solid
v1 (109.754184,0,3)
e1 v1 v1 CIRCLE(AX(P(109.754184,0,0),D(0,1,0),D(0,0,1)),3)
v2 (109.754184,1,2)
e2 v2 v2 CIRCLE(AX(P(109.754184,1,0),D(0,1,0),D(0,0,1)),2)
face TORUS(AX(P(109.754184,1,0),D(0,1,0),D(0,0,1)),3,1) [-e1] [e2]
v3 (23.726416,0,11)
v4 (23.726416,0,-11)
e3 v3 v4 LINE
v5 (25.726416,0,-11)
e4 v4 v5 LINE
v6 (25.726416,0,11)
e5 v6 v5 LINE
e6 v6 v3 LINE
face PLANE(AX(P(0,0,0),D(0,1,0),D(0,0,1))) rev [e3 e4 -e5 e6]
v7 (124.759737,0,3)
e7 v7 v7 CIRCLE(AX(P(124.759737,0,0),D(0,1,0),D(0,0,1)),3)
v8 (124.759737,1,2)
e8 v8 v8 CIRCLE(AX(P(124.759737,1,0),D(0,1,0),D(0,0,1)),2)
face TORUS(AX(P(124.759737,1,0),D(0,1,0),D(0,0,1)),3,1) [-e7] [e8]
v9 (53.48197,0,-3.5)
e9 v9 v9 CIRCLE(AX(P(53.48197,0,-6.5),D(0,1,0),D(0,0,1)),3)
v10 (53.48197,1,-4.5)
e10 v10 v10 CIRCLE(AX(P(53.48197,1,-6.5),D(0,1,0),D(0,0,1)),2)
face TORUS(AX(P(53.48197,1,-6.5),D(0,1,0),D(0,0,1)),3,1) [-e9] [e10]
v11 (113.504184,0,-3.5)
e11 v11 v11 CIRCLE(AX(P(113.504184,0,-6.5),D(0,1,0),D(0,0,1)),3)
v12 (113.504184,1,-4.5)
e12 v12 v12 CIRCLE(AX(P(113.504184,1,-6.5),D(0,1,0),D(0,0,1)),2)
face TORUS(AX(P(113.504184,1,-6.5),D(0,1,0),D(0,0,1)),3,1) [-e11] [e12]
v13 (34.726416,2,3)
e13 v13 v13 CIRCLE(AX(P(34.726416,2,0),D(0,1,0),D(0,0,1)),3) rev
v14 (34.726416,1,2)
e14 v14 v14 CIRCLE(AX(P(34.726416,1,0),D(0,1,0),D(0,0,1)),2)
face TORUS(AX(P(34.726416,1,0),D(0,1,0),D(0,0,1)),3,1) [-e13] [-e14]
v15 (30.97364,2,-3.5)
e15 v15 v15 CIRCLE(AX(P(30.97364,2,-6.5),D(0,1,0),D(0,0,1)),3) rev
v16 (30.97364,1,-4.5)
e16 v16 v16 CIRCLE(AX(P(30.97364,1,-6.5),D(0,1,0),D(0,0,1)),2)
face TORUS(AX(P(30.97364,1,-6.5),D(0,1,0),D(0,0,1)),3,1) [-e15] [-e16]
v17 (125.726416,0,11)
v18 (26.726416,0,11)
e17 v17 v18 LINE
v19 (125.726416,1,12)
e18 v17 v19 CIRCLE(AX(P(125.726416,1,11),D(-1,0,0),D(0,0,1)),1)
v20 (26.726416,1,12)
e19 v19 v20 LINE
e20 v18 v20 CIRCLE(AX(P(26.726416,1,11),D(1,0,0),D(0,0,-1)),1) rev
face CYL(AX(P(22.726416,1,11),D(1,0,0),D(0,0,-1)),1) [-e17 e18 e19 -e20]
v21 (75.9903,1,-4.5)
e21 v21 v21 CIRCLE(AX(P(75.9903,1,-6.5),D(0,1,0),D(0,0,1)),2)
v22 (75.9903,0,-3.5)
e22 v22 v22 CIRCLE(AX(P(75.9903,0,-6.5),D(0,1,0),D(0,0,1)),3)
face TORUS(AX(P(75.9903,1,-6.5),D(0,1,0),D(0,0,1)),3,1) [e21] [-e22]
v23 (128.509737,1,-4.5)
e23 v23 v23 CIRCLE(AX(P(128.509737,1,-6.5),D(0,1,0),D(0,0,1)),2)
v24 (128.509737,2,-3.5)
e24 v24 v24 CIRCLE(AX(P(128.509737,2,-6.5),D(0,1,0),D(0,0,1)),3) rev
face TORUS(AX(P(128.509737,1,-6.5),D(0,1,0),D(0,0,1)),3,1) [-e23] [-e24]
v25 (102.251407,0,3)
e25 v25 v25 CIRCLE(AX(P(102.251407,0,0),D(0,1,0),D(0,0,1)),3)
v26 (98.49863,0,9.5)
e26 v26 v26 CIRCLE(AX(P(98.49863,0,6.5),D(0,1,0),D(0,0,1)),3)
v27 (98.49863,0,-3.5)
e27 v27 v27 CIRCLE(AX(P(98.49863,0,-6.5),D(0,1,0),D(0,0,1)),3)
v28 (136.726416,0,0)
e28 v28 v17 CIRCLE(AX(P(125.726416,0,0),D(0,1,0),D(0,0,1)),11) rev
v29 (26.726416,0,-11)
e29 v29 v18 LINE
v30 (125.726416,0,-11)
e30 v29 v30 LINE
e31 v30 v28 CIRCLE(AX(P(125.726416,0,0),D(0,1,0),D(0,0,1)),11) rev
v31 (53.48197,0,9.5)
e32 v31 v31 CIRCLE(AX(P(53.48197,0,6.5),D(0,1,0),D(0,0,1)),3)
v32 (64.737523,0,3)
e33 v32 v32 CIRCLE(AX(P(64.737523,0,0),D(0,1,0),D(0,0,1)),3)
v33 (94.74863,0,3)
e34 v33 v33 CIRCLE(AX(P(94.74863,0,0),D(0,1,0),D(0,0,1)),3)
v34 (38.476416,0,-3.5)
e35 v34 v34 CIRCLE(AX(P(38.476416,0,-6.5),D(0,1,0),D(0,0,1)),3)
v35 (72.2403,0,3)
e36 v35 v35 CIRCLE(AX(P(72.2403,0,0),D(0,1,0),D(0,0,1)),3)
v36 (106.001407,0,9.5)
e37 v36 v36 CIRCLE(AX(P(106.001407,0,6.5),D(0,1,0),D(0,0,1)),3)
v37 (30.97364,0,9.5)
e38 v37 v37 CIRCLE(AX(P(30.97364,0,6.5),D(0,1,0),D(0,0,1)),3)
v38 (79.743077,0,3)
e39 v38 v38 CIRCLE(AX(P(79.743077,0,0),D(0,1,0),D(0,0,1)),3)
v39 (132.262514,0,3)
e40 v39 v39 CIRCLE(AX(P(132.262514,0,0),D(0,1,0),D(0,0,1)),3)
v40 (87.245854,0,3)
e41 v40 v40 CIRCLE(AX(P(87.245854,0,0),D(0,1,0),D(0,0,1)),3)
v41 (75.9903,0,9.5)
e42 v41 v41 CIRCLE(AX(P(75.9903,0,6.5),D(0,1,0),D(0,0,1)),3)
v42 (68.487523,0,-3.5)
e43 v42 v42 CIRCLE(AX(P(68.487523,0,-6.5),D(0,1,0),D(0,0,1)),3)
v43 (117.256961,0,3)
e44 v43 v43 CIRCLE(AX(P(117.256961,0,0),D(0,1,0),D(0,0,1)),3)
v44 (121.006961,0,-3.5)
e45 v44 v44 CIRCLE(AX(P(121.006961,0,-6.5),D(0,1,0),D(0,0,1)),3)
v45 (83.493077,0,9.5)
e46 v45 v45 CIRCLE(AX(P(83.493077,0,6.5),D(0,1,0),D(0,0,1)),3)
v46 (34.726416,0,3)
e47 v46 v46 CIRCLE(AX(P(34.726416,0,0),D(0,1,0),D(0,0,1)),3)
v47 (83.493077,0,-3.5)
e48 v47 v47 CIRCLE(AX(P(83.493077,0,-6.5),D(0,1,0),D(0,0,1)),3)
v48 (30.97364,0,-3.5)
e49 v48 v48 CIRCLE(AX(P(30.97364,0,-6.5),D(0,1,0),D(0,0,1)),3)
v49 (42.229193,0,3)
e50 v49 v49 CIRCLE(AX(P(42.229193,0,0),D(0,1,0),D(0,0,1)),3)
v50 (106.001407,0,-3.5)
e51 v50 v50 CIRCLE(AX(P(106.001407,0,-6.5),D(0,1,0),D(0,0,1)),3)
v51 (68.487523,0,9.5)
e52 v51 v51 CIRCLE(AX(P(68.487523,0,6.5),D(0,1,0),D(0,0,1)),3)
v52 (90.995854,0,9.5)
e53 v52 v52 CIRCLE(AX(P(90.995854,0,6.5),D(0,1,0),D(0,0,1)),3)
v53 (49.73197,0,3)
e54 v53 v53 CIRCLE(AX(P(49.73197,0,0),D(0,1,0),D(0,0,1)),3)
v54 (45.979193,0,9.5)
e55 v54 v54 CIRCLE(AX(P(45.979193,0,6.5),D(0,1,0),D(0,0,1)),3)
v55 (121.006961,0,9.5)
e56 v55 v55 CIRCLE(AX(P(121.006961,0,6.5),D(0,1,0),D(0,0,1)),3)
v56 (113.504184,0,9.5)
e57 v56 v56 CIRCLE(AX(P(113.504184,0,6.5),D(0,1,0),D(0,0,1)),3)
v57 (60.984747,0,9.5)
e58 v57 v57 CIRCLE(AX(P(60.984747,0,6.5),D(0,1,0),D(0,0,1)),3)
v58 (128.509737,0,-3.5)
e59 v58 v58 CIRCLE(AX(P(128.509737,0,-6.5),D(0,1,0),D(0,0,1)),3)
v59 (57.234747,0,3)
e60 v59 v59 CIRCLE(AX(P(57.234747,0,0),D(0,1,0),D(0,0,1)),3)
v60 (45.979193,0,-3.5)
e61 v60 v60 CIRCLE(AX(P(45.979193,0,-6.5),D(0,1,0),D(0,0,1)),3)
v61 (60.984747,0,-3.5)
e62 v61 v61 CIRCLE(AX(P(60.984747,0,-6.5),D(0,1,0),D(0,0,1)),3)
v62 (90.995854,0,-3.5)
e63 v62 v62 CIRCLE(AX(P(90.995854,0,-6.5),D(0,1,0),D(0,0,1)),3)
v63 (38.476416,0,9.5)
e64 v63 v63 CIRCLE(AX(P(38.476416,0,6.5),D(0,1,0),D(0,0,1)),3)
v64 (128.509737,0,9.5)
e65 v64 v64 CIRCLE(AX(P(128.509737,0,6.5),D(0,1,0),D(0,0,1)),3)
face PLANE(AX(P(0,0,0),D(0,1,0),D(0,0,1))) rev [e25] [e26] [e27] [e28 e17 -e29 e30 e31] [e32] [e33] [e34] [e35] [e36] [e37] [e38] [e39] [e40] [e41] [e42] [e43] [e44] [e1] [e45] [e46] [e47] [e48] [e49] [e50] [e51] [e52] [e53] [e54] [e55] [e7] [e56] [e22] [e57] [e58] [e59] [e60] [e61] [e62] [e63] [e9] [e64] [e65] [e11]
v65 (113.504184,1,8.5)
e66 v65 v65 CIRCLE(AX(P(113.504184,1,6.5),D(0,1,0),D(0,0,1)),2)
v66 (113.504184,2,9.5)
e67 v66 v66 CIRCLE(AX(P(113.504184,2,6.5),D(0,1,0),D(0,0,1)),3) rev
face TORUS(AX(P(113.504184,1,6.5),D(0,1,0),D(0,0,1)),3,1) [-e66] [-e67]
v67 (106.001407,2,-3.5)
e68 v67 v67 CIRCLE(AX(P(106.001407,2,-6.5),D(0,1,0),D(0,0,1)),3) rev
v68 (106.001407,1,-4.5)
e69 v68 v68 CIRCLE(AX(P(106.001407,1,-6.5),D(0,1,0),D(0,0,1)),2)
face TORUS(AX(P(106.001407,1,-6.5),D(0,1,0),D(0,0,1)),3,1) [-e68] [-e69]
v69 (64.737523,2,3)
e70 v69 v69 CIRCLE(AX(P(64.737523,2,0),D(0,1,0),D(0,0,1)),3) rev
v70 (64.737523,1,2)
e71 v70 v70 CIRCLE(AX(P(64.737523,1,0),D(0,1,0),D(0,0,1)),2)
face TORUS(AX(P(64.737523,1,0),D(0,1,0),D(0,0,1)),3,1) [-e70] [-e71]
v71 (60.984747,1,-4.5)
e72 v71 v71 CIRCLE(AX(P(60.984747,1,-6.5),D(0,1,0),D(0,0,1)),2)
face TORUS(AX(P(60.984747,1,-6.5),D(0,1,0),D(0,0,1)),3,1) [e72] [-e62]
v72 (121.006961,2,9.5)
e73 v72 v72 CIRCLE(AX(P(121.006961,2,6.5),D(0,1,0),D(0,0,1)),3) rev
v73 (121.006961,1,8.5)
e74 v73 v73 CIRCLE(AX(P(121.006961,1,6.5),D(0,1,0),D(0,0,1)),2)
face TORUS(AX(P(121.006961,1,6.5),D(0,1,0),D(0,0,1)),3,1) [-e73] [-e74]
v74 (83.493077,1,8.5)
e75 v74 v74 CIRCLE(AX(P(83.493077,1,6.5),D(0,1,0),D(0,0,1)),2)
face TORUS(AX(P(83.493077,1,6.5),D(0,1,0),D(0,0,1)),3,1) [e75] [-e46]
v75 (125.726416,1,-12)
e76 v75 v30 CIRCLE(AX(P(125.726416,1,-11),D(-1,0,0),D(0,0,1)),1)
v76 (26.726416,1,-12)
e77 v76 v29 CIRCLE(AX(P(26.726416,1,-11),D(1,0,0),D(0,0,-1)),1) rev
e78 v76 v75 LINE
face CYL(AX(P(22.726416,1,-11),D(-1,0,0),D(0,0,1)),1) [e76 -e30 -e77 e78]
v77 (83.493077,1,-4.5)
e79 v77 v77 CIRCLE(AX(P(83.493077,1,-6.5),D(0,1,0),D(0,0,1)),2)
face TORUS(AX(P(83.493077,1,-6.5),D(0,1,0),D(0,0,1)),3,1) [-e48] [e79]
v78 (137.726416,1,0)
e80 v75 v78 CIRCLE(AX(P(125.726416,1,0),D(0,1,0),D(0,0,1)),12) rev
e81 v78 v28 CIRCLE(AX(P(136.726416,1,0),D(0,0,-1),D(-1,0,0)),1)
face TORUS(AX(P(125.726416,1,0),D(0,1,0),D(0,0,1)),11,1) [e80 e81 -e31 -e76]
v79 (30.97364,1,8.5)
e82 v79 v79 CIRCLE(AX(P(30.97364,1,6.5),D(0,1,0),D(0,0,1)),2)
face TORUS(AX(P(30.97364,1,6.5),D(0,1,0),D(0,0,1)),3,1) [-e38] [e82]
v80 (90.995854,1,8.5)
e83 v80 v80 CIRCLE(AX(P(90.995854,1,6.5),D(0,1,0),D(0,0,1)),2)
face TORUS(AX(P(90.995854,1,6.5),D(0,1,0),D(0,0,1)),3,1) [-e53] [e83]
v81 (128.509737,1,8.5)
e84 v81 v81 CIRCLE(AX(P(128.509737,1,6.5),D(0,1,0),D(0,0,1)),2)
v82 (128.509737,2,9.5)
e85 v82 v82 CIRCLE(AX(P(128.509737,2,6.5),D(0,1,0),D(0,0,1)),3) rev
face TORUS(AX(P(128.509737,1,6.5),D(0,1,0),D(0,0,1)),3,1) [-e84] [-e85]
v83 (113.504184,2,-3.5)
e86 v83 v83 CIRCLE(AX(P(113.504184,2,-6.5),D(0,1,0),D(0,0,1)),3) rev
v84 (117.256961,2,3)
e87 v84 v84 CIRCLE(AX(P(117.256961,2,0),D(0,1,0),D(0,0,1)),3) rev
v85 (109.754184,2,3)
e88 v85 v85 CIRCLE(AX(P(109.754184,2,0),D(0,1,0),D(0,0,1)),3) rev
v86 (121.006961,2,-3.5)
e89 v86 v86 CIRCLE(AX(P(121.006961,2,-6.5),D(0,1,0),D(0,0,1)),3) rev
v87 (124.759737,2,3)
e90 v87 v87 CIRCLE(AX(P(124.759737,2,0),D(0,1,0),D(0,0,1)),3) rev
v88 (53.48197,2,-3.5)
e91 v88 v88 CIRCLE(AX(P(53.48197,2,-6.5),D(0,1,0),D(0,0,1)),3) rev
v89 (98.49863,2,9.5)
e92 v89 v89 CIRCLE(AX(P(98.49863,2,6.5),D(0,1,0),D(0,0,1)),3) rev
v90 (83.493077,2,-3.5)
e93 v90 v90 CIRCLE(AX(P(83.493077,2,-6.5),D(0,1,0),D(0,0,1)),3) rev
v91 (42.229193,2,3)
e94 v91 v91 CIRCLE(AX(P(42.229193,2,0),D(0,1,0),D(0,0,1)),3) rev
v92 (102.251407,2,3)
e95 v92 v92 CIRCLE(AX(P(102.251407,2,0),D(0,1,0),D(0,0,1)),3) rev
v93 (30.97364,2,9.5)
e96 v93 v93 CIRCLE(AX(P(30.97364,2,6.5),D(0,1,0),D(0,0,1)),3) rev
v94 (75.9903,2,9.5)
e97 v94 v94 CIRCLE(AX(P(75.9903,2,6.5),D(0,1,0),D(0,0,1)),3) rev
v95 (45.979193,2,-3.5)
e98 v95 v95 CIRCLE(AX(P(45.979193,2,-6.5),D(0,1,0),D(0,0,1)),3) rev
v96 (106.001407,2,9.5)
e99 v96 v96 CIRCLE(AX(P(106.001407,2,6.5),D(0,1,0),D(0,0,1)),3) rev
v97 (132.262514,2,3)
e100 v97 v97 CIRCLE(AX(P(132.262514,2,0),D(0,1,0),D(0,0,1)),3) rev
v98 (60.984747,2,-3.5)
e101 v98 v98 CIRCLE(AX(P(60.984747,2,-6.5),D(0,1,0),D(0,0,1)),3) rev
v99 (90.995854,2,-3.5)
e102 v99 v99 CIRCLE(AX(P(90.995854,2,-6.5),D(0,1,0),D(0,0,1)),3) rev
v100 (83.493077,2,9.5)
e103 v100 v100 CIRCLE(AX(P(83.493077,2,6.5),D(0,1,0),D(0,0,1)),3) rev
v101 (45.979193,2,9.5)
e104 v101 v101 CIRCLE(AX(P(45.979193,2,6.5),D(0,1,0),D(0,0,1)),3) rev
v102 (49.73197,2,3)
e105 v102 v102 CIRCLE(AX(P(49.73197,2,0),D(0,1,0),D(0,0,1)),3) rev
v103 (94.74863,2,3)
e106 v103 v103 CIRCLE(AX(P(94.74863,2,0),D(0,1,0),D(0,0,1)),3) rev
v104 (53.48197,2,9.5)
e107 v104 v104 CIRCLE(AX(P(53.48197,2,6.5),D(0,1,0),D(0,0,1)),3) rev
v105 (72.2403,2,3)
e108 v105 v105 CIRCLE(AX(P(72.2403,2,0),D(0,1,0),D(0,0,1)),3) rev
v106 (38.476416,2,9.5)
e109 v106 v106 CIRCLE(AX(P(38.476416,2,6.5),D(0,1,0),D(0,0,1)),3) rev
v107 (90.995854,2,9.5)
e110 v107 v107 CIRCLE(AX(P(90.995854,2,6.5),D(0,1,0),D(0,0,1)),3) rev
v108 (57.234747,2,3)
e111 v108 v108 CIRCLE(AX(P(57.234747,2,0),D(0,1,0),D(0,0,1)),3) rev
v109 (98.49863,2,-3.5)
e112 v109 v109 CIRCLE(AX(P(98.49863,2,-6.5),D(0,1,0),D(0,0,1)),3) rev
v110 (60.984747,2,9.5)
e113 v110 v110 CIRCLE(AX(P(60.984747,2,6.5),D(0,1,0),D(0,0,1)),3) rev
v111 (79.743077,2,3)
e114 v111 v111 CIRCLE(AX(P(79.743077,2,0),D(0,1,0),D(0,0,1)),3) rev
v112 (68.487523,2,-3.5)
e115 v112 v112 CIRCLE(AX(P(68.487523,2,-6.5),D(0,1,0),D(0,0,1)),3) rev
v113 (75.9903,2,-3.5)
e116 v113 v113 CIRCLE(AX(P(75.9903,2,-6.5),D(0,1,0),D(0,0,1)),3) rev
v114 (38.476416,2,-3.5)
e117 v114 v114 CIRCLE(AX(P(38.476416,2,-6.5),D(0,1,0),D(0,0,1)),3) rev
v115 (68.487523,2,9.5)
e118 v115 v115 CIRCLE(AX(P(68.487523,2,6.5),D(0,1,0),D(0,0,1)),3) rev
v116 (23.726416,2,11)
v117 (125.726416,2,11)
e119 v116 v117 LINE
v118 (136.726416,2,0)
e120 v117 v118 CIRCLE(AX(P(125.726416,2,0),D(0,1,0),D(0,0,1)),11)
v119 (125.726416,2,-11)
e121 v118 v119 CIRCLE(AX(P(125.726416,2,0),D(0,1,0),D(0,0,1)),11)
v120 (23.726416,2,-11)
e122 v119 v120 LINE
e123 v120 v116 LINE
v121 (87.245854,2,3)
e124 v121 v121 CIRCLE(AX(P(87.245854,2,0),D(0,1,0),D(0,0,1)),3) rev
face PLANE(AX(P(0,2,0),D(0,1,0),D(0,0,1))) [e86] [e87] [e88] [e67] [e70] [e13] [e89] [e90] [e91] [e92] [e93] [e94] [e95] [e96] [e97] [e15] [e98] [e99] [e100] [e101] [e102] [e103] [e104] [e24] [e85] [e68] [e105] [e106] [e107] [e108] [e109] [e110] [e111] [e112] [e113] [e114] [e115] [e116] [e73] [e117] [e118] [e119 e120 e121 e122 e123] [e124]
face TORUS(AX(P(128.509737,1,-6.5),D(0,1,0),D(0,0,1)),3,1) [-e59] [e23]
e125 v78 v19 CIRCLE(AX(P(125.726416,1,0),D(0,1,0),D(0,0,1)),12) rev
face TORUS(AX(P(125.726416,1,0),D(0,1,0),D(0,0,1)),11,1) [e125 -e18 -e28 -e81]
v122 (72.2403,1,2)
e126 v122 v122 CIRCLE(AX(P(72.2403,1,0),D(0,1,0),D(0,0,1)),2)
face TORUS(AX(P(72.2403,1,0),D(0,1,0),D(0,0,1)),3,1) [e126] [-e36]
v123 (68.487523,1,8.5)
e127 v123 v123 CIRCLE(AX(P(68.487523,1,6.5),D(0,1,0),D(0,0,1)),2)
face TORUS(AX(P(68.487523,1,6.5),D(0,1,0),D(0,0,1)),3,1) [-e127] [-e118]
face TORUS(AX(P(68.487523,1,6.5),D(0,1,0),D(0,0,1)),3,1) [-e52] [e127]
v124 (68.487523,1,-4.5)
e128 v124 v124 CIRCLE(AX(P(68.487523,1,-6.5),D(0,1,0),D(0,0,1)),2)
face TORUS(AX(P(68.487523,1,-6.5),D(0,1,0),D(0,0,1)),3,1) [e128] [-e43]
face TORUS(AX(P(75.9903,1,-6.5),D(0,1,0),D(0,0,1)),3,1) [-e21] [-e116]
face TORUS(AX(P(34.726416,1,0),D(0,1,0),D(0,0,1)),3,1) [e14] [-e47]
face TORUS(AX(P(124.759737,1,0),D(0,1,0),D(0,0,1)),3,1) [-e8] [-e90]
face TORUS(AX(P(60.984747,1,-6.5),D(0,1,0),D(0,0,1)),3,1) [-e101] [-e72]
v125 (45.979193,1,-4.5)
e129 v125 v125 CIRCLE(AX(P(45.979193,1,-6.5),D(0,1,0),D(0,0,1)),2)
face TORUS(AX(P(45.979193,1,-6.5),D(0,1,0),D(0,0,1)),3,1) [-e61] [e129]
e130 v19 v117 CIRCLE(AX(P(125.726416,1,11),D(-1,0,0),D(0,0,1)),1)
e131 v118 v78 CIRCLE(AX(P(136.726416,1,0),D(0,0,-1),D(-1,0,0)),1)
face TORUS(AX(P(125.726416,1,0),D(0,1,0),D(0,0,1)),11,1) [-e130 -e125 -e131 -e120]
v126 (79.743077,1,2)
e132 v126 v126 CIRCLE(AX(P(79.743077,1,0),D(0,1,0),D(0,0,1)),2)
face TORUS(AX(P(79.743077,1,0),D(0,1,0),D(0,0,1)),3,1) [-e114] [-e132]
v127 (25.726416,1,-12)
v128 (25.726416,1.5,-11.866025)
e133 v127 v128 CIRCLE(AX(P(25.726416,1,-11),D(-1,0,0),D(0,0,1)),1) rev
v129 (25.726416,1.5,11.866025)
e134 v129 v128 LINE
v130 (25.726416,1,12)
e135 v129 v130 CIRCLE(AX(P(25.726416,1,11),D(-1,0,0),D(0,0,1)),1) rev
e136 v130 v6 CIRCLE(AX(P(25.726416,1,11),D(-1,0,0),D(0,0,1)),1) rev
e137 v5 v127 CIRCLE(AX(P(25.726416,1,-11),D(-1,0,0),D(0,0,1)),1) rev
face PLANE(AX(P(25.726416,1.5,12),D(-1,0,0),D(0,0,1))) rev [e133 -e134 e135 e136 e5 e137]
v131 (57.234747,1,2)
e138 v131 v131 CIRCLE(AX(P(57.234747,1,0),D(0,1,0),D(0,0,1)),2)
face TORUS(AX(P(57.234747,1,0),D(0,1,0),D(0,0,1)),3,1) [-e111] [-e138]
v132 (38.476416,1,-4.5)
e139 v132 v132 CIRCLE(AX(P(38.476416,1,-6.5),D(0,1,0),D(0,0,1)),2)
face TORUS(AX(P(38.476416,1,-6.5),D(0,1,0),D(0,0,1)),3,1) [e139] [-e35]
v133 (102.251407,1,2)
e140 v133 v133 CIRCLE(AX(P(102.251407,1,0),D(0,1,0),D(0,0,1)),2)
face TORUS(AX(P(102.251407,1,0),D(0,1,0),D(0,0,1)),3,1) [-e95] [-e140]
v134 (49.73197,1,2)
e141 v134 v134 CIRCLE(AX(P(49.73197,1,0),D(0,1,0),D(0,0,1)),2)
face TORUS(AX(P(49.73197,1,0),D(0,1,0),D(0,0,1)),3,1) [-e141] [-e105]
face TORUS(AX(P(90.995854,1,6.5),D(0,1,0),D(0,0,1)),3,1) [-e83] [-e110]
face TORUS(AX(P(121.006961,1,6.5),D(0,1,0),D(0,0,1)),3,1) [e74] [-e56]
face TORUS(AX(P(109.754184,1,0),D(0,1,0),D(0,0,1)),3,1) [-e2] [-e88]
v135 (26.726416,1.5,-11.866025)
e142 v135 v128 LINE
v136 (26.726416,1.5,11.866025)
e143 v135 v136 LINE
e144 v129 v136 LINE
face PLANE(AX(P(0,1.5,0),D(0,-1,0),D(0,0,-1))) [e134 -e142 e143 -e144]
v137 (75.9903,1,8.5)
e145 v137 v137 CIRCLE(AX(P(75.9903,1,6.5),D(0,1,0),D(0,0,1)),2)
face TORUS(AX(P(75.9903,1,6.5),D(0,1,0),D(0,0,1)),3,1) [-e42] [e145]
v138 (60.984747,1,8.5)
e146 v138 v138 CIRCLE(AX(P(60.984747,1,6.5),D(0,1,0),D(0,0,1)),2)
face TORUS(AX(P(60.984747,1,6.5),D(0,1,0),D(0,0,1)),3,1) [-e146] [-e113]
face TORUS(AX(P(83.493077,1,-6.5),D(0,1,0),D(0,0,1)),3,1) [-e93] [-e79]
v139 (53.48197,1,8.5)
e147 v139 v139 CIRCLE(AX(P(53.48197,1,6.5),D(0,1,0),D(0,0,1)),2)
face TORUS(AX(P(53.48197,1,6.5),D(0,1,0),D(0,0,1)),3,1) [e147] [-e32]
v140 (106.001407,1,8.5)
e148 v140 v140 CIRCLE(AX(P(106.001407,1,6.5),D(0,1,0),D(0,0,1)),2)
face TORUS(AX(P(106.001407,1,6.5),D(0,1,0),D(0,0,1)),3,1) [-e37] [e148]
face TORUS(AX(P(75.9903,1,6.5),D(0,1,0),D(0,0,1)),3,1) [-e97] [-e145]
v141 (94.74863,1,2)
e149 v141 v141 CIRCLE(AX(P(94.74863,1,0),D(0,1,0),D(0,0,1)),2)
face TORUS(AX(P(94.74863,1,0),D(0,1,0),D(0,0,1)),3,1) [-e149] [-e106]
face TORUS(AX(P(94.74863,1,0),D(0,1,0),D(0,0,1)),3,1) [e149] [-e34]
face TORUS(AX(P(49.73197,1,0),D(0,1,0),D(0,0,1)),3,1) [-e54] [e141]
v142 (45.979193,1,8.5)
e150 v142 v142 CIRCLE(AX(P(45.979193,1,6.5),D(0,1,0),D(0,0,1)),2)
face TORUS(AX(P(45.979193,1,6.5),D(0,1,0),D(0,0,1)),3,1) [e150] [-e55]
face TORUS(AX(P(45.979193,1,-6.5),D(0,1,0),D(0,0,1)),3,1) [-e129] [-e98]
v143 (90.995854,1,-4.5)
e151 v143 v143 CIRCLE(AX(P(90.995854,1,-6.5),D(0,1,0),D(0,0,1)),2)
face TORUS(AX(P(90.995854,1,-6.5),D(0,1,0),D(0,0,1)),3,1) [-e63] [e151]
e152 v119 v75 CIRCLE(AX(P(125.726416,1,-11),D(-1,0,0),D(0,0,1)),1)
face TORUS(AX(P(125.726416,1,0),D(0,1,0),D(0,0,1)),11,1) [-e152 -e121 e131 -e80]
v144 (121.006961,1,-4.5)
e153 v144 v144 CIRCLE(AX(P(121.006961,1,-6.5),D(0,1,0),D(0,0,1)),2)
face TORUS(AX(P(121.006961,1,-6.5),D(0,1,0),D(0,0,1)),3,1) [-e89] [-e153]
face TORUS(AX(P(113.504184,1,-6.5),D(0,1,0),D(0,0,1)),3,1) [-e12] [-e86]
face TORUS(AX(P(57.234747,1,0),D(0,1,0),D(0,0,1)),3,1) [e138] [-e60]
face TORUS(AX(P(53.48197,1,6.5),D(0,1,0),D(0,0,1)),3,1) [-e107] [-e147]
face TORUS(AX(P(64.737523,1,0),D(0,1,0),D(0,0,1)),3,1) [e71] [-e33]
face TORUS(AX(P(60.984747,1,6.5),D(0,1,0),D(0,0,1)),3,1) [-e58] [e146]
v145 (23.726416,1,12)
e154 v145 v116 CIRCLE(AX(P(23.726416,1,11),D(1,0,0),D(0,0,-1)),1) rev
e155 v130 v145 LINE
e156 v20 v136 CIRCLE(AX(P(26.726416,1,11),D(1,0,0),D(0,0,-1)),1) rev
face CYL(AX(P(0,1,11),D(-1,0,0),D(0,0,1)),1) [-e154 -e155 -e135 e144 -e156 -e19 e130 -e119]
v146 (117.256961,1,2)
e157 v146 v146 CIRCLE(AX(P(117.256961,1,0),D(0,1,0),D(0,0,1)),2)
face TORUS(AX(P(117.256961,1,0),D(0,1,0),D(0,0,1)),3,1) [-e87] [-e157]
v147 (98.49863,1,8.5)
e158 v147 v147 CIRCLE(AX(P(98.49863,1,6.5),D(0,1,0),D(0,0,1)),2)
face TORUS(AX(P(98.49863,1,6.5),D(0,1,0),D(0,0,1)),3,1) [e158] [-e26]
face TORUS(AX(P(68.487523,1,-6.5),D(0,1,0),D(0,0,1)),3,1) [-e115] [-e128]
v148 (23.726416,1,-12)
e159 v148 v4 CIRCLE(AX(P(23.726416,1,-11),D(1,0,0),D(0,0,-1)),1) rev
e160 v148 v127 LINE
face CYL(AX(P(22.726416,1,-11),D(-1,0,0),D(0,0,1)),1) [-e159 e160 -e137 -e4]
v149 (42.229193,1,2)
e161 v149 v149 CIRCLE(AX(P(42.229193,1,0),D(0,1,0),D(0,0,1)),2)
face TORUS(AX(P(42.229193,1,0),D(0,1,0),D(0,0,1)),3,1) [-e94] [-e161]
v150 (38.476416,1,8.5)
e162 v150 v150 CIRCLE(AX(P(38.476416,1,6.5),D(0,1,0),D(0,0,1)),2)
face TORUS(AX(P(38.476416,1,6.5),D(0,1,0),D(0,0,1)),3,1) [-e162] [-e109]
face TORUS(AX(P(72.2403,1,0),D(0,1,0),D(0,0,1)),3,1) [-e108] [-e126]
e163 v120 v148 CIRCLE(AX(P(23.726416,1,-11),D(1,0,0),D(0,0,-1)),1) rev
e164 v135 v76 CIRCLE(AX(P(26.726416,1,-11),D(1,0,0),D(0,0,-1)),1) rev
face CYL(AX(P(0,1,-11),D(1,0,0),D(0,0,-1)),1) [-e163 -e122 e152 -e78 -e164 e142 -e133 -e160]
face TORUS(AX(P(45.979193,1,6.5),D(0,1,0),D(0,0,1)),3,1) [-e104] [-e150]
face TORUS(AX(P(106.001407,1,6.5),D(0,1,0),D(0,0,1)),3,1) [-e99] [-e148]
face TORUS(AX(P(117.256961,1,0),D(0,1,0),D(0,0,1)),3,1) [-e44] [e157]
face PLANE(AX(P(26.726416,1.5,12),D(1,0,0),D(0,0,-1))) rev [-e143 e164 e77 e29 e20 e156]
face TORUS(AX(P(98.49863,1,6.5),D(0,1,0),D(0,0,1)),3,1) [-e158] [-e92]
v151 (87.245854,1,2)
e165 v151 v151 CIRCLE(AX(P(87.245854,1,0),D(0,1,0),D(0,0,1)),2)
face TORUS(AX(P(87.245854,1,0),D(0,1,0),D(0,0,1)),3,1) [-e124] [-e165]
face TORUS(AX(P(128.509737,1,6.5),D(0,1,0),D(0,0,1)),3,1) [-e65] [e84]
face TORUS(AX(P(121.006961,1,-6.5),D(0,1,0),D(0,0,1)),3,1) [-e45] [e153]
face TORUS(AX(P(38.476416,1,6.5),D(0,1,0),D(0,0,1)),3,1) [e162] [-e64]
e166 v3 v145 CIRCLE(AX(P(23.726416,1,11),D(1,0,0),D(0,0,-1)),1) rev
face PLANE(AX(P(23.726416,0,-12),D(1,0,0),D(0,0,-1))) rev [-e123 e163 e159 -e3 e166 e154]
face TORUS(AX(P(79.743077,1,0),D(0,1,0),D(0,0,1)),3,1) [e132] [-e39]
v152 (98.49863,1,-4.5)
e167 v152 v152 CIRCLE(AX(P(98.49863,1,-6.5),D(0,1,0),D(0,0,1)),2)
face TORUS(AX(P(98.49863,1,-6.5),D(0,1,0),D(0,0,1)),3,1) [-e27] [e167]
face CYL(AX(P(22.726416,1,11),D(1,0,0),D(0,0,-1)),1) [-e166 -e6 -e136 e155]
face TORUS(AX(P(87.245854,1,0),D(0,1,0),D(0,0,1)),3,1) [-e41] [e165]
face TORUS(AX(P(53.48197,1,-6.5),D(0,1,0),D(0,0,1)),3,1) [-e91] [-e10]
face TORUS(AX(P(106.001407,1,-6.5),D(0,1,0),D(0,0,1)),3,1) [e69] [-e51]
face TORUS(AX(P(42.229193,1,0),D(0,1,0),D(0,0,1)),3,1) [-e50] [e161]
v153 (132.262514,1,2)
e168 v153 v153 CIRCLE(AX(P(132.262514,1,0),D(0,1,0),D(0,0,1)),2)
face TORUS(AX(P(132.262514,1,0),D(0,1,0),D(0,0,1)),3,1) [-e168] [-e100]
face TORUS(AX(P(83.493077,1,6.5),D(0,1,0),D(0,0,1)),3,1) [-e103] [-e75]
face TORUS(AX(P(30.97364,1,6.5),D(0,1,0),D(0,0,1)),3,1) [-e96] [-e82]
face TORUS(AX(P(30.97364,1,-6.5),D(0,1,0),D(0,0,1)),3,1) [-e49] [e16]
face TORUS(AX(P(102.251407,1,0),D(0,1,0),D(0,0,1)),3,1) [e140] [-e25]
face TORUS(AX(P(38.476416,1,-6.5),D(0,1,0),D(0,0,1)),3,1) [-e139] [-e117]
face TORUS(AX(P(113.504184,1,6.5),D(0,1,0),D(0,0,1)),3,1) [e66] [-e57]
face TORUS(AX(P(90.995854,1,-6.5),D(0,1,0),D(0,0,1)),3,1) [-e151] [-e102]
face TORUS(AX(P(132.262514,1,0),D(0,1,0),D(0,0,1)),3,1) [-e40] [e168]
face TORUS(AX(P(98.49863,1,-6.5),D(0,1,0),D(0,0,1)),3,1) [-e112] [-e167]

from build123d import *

# Parameters (mm, degrees)
SKETCH1_W               = 115
SKETCH1_H               = 24
BOSS_EXTRUDE1_DEPTH     = 2
FILLET4_R               = 12
SKETCH4_R               = 2
CUT_EXTRUDE2_DEPTH      = 139.262669437
FILLET3_R               = 1
CUT_EXTRUDE6_DEPTH      = 139.262669437
CUT_EXTRUDE6_DEPTH_BACK = 139.262669437
SKETCH11_W              = 1
SKETCH11_H              = 24
SKETCH12_W              = 1
SKETCH12_H              = 24
CUT_EXTRUDE7_DEPTH      = 1.5


with BuildPart() as part:
    # Sketch1 → Boss-Extrude1 (new body)
    with BuildSketch(Plane(origin=(0, 0, 0), x_dir=(1, 0, 0), z_dir=(0, 1, 0))):
        with Locations((80.226416348, 0)):
            Rectangle(SKETCH1_W, SKETCH1_H)
    extrude(amount=BOSS_EXTRUDE1_DEPTH)

    # Fillet4
    fillet4_edges = [part.edges().sort_by_distance(p)[0] for p in [
        (137.726416348, 1, 12),
        (137.726416348, 1, -12),
    ]]
    fillet(fillet4_edges, radius=FILLET4_R - 0.0001)  # a hair under: the kernel refuses the full size

    # Sketch4 → Cut-Extrude2 (cut, through all)
    with BuildSketch(Plane(origin=(0, 2, 0), x_dir=(1, 0, 0), z_dir=(0, 1, 0))):
        with Locations(Location((30.973639598, 6.5, 0), (0, 0, 270))):
            Circle(SKETCH4_R)
        with Locations(Location((34.726416348, 0, 0), (0, 0, 270))):
            Circle(SKETCH4_R)
        with Locations(Location((30.973639598, -6.5, 0), (0, 0, 270))):
            Circle(SKETCH4_R)
        with Locations(Location((42.229193097, 0, 0), (0, 0, 270))):
            Circle(SKETCH4_R)
        with Locations(Location((38.476416348, 6.5, 0), (0, 0, 270))):
            Circle(SKETCH4_R)
        with Locations(Location((38.476416348, -6.5, 0), (0, 0, 270))):
            Circle(SKETCH4_R)
        with Locations(Location((49.731969847, 0, 0), (0, 0, 270))):
            Circle(SKETCH4_R)
        with Locations(Location((45.979193097, 6.5, 0), (0, 0, 270))):
            Circle(SKETCH4_R)
        with Locations(Location((45.979193097, -6.5, 0), (0, 0, 270))):
            Circle(SKETCH4_R)
        with Locations(Location((57.234746597, 0, 0), (0, 0, 270))):
            Circle(SKETCH4_R)
        with Locations(Location((53.481969847, 6.5, 0), (0, 0, 270))):
            Circle(SKETCH4_R)
        with Locations(Location((53.481969847, -6.5, 0), (0, 0, 270))):
            Circle(SKETCH4_R)
        with Locations(Location((64.737523346, 0, 0), (0, 0, 270))):
            Circle(SKETCH4_R)
        with Locations(Location((60.984746597, 6.5, 0), (0, 0, 270))):
            Circle(SKETCH4_R)
        with Locations(Location((60.984746597, -6.5, 0), (0, 0, 270))):
            Circle(SKETCH4_R)
        with Locations(Location((72.240300096, 0, 0), (0, 0, 270))):
            Circle(SKETCH4_R)
        with Locations(Location((68.487523346, 6.5, 0), (0, 0, 270))):
            Circle(SKETCH4_R)
        with Locations(Location((68.487523346, -6.5, 0), (0, 0, 270))):
            Circle(SKETCH4_R)
        with Locations(Location((79.743076846, 0, 0), (0, 0, 270))):
            Circle(SKETCH4_R)
        with Locations(Location((75.990300096, 6.5, 0), (0, 0, 270))):
            Circle(SKETCH4_R)
        with Locations(Location((75.990300096, -6.5, 0), (0, 0, 270))):
            Circle(SKETCH4_R)
        with Locations(Location((87.245853596, 0, 0), (0, 0, 270))):
            Circle(SKETCH4_R)
        with Locations(Location((83.493076846, 6.5, 0), (0, 0, 270))):
            Circle(SKETCH4_R)
        with Locations(Location((83.493076846, -6.5, 0), (0, 0, 270))):
            Circle(SKETCH4_R)
        with Locations(Location((94.748630345, 0, 0), (0, 0, 270))):
            Circle(SKETCH4_R)
        with Locations(Location((90.995853596, 6.5, 0), (0, 0, 270))):
            Circle(SKETCH4_R)
        with Locations(Location((90.995853596, -6.5, 0), (0, 0, 270))):
            Circle(SKETCH4_R)
        with Locations(Location((102.251407095, 0, 0), (0, 0, 270))):
            Circle(SKETCH4_R)
        with Locations(Location((98.498630345, 6.5, 0), (0, 0, 270))):
            Circle(SKETCH4_R)
        with Locations(Location((98.498630345, -6.5, 0), (0, 0, 270))):
            Circle(SKETCH4_R)
        with Locations(Location((109.754183845, 0, 0), (0, 0, 270))):
            Circle(SKETCH4_R)
        with Locations(Location((106.001407095, 6.5, 0), (0, 0, 270))):
            Circle(SKETCH4_R)
        with Locations(Location((106.001407095, -6.5, 0), (0, 0, 270))):
            Circle(SKETCH4_R)
        with Locations(Location((117.256960595, 0, 0), (0, 0, 270))):
            Circle(SKETCH4_R)
        with Locations(Location((113.504183845, 6.5, 0), (0, 0, 270))):
            Circle(SKETCH4_R)
        with Locations(Location((113.504183845, -6.5, 0), (0, 0, 270))):
            Circle(SKETCH4_R)
        with Locations(Location((124.759737344, 0, 0), (0, 0, 270))):
            Circle(SKETCH4_R)
        with Locations(Location((121.006960595, 6.5, 0), (0, 0, 270))):
            Circle(SKETCH4_R)
        with Locations(Location((121.006960595, -6.5, 0), (0, 0, 270))):
            Circle(SKETCH4_R)
        with Locations(Location((132.262514094, 0, 0), (0, 0, 270))):
            Circle(SKETCH4_R)
        with Locations(Location((128.509737344, 6.5, 0), (0, 0, 270))):
            Circle(SKETCH4_R)
        with Locations(Location((128.509737344, -6.5, 0), (0, 0, 270))):
            Circle(SKETCH4_R)
    extrude(amount=-CUT_EXTRUDE2_DEPTH, mode=Mode.SUBTRACT)

    # Fillet3
    fillet3_edges = [part.edges().sort_by_distance(p)[0] for p in [
        (74.226466348, 0, 12),
        (74.226466348, 0, -12),
        (30.973639598, 0, -8.5),
        (113.504183845, 0, 4.5),
        (117.256960595, 0, -2),
        (113.504183845, 0, -8.5),
        (60.984746597, 0, -8.5),
        (53.481969847, 0, 4.5),
        (57.234746597, 0, -2),
        (53.481969847, 0, -8.5),
        (72.240300096, 0, -2),
        (68.487523346, 0, -8.5),
        (60.984746597, 0, 4.5),
        (64.737523346, 0, -2),
        (42.229193097, 0, -2),
        (38.476416348, 0, -8.5),
        (30.973639598, 0, 4.5),
        (34.726416348, 0, -2),
        (45.979193097, 0, 4.5),
        (49.731969847, 0, -2),
        (45.979193097, 0, -8.5),
        (38.476416348, 0, 4.5),
        (102.251407095, 0, -2),
        (98.498630345, 0, -8.5),
        (90.995853596, 0, 4.5),
        (94.748630345, 0, -2),
        (106.001407095, 0, 4.5),
        (109.754183845, 0, -2),
        (106.001407095, 0, -8.5),
        (98.498630345, 0, 4.5),
        (75.990300096, 0, 4.5),
        (79.743076846, 0, -2),
        (75.990300096, 0, -8.5),
        (68.487523346, 0, 4.5),
        (90.995853596, 0, -8.5),
        (83.493076846, 0, 4.5),
        (87.245853596, 0, -2),
        (83.493076846, 0, -8.5),
        (74.226466348, 2, 12),
        (74.226466348, 2, -12),
        (30.973639598, 2, -8.5),
        (113.504183845, 2, 4.5),
        (117.256960595, 2, -2),
        (113.504183845, 2, -8.5),
        (60.984746597, 2, -8.5),
        (53.481969847, 2, 4.5),
        (57.234746597, 2, -2),
        (53.481969847, 2, -8.5),
        (72.240300096, 2, -2),
        (68.487523346, 2, -8.5),
        (60.984746597, 2, 4.5),
        (64.737523346, 2, -2),
        (42.229193097, 2, -2),
        (38.476416348, 2, -8.5),
        (30.973639598, 2, 4.5),
        (34.726416348, 2, -2),
        (45.979193097, 2, 4.5),
        (49.731969847, 2, -2),
        (45.979193097, 2, -8.5),
        (38.476416348, 2, 4.5),
        (102.251407095, 2, -2),
        (98.498630345, 2, -8.5),
        (90.995853596, 2, 4.5),
        (94.748630345, 2, -2),
        (106.001407095, 2, 4.5),
        (109.754183845, 2, -2),
        (106.001407095, 2, -8.5),
        (98.498630345, 2, 4.5),
        (75.990300096, 2, 4.5),
        (79.743076846, 2, -2),
        (75.990300096, 2, -8.5),
        (68.487523346, 2, 4.5),
        (90.995853596, 2, -8.5),
        (83.493076846, 2, 4.5),
        (87.245853596, 2, -2),
        (83.493076846, 2, -8.5),
        (128.509737344, 0, -8.5),
        (128.509737344, 2, -8.5),
        (22.726416348, 0, 0),
        (22.726416348, 2, 0),
        (132.262514094, 0, -2),
        (121.006960595, 0, 4.5),
        (128.509737344, 0, 4.5),
        (121.006960595, 0, -8.5),
        (124.759737344, 0, -2),
        (132.262514094, 2, -2),
        (121.006960595, 2, 4.5),
        (128.509737344, 2, 4.5),
        (121.006960595, 2, -8.5),
        (124.759737344, 2, -2),
        (134.211727011, 0, 8.485310664),
        (134.211727011, 0, -8.485310664),
        (134.211727011, 2, -8.485310664),
        (134.211727011, 2, 8.485310664),
    ]]
    fillet(fillet3_edges, radius=FILLET3_R - 0.0001)  # a hair under: the kernel refuses the full size

    # Sketch11 → Cut-Extrude6 (cut, two sides: drawn at the far end of the back side and taken through both)
    with BuildSketch(Plane(origin=(0, 2, 0), x_dir=(1, 0, 0), z_dir=(0, 1, 0)).offset(-CUT_EXTRUDE6_DEPTH_BACK)):
        with Locations((23.226416348, 0)):
            Rectangle(SKETCH11_W, SKETCH11_H)
    extrude(amount=CUT_EXTRUDE6_DEPTH + CUT_EXTRUDE6_DEPTH_BACK, mode=Mode.SUBTRACT)

    # Sketch12 → Cut-Extrude7 (cut)
    with BuildSketch(Plane.XZ):
        with Locations((26.226416348, 0)):
            Rectangle(SKETCH12_W, SKETCH12_H)
    extrude(amount=-CUT_EXTRUDE7_DEPTH, mode=Mode.SUBTRACT)


solid = part.part
